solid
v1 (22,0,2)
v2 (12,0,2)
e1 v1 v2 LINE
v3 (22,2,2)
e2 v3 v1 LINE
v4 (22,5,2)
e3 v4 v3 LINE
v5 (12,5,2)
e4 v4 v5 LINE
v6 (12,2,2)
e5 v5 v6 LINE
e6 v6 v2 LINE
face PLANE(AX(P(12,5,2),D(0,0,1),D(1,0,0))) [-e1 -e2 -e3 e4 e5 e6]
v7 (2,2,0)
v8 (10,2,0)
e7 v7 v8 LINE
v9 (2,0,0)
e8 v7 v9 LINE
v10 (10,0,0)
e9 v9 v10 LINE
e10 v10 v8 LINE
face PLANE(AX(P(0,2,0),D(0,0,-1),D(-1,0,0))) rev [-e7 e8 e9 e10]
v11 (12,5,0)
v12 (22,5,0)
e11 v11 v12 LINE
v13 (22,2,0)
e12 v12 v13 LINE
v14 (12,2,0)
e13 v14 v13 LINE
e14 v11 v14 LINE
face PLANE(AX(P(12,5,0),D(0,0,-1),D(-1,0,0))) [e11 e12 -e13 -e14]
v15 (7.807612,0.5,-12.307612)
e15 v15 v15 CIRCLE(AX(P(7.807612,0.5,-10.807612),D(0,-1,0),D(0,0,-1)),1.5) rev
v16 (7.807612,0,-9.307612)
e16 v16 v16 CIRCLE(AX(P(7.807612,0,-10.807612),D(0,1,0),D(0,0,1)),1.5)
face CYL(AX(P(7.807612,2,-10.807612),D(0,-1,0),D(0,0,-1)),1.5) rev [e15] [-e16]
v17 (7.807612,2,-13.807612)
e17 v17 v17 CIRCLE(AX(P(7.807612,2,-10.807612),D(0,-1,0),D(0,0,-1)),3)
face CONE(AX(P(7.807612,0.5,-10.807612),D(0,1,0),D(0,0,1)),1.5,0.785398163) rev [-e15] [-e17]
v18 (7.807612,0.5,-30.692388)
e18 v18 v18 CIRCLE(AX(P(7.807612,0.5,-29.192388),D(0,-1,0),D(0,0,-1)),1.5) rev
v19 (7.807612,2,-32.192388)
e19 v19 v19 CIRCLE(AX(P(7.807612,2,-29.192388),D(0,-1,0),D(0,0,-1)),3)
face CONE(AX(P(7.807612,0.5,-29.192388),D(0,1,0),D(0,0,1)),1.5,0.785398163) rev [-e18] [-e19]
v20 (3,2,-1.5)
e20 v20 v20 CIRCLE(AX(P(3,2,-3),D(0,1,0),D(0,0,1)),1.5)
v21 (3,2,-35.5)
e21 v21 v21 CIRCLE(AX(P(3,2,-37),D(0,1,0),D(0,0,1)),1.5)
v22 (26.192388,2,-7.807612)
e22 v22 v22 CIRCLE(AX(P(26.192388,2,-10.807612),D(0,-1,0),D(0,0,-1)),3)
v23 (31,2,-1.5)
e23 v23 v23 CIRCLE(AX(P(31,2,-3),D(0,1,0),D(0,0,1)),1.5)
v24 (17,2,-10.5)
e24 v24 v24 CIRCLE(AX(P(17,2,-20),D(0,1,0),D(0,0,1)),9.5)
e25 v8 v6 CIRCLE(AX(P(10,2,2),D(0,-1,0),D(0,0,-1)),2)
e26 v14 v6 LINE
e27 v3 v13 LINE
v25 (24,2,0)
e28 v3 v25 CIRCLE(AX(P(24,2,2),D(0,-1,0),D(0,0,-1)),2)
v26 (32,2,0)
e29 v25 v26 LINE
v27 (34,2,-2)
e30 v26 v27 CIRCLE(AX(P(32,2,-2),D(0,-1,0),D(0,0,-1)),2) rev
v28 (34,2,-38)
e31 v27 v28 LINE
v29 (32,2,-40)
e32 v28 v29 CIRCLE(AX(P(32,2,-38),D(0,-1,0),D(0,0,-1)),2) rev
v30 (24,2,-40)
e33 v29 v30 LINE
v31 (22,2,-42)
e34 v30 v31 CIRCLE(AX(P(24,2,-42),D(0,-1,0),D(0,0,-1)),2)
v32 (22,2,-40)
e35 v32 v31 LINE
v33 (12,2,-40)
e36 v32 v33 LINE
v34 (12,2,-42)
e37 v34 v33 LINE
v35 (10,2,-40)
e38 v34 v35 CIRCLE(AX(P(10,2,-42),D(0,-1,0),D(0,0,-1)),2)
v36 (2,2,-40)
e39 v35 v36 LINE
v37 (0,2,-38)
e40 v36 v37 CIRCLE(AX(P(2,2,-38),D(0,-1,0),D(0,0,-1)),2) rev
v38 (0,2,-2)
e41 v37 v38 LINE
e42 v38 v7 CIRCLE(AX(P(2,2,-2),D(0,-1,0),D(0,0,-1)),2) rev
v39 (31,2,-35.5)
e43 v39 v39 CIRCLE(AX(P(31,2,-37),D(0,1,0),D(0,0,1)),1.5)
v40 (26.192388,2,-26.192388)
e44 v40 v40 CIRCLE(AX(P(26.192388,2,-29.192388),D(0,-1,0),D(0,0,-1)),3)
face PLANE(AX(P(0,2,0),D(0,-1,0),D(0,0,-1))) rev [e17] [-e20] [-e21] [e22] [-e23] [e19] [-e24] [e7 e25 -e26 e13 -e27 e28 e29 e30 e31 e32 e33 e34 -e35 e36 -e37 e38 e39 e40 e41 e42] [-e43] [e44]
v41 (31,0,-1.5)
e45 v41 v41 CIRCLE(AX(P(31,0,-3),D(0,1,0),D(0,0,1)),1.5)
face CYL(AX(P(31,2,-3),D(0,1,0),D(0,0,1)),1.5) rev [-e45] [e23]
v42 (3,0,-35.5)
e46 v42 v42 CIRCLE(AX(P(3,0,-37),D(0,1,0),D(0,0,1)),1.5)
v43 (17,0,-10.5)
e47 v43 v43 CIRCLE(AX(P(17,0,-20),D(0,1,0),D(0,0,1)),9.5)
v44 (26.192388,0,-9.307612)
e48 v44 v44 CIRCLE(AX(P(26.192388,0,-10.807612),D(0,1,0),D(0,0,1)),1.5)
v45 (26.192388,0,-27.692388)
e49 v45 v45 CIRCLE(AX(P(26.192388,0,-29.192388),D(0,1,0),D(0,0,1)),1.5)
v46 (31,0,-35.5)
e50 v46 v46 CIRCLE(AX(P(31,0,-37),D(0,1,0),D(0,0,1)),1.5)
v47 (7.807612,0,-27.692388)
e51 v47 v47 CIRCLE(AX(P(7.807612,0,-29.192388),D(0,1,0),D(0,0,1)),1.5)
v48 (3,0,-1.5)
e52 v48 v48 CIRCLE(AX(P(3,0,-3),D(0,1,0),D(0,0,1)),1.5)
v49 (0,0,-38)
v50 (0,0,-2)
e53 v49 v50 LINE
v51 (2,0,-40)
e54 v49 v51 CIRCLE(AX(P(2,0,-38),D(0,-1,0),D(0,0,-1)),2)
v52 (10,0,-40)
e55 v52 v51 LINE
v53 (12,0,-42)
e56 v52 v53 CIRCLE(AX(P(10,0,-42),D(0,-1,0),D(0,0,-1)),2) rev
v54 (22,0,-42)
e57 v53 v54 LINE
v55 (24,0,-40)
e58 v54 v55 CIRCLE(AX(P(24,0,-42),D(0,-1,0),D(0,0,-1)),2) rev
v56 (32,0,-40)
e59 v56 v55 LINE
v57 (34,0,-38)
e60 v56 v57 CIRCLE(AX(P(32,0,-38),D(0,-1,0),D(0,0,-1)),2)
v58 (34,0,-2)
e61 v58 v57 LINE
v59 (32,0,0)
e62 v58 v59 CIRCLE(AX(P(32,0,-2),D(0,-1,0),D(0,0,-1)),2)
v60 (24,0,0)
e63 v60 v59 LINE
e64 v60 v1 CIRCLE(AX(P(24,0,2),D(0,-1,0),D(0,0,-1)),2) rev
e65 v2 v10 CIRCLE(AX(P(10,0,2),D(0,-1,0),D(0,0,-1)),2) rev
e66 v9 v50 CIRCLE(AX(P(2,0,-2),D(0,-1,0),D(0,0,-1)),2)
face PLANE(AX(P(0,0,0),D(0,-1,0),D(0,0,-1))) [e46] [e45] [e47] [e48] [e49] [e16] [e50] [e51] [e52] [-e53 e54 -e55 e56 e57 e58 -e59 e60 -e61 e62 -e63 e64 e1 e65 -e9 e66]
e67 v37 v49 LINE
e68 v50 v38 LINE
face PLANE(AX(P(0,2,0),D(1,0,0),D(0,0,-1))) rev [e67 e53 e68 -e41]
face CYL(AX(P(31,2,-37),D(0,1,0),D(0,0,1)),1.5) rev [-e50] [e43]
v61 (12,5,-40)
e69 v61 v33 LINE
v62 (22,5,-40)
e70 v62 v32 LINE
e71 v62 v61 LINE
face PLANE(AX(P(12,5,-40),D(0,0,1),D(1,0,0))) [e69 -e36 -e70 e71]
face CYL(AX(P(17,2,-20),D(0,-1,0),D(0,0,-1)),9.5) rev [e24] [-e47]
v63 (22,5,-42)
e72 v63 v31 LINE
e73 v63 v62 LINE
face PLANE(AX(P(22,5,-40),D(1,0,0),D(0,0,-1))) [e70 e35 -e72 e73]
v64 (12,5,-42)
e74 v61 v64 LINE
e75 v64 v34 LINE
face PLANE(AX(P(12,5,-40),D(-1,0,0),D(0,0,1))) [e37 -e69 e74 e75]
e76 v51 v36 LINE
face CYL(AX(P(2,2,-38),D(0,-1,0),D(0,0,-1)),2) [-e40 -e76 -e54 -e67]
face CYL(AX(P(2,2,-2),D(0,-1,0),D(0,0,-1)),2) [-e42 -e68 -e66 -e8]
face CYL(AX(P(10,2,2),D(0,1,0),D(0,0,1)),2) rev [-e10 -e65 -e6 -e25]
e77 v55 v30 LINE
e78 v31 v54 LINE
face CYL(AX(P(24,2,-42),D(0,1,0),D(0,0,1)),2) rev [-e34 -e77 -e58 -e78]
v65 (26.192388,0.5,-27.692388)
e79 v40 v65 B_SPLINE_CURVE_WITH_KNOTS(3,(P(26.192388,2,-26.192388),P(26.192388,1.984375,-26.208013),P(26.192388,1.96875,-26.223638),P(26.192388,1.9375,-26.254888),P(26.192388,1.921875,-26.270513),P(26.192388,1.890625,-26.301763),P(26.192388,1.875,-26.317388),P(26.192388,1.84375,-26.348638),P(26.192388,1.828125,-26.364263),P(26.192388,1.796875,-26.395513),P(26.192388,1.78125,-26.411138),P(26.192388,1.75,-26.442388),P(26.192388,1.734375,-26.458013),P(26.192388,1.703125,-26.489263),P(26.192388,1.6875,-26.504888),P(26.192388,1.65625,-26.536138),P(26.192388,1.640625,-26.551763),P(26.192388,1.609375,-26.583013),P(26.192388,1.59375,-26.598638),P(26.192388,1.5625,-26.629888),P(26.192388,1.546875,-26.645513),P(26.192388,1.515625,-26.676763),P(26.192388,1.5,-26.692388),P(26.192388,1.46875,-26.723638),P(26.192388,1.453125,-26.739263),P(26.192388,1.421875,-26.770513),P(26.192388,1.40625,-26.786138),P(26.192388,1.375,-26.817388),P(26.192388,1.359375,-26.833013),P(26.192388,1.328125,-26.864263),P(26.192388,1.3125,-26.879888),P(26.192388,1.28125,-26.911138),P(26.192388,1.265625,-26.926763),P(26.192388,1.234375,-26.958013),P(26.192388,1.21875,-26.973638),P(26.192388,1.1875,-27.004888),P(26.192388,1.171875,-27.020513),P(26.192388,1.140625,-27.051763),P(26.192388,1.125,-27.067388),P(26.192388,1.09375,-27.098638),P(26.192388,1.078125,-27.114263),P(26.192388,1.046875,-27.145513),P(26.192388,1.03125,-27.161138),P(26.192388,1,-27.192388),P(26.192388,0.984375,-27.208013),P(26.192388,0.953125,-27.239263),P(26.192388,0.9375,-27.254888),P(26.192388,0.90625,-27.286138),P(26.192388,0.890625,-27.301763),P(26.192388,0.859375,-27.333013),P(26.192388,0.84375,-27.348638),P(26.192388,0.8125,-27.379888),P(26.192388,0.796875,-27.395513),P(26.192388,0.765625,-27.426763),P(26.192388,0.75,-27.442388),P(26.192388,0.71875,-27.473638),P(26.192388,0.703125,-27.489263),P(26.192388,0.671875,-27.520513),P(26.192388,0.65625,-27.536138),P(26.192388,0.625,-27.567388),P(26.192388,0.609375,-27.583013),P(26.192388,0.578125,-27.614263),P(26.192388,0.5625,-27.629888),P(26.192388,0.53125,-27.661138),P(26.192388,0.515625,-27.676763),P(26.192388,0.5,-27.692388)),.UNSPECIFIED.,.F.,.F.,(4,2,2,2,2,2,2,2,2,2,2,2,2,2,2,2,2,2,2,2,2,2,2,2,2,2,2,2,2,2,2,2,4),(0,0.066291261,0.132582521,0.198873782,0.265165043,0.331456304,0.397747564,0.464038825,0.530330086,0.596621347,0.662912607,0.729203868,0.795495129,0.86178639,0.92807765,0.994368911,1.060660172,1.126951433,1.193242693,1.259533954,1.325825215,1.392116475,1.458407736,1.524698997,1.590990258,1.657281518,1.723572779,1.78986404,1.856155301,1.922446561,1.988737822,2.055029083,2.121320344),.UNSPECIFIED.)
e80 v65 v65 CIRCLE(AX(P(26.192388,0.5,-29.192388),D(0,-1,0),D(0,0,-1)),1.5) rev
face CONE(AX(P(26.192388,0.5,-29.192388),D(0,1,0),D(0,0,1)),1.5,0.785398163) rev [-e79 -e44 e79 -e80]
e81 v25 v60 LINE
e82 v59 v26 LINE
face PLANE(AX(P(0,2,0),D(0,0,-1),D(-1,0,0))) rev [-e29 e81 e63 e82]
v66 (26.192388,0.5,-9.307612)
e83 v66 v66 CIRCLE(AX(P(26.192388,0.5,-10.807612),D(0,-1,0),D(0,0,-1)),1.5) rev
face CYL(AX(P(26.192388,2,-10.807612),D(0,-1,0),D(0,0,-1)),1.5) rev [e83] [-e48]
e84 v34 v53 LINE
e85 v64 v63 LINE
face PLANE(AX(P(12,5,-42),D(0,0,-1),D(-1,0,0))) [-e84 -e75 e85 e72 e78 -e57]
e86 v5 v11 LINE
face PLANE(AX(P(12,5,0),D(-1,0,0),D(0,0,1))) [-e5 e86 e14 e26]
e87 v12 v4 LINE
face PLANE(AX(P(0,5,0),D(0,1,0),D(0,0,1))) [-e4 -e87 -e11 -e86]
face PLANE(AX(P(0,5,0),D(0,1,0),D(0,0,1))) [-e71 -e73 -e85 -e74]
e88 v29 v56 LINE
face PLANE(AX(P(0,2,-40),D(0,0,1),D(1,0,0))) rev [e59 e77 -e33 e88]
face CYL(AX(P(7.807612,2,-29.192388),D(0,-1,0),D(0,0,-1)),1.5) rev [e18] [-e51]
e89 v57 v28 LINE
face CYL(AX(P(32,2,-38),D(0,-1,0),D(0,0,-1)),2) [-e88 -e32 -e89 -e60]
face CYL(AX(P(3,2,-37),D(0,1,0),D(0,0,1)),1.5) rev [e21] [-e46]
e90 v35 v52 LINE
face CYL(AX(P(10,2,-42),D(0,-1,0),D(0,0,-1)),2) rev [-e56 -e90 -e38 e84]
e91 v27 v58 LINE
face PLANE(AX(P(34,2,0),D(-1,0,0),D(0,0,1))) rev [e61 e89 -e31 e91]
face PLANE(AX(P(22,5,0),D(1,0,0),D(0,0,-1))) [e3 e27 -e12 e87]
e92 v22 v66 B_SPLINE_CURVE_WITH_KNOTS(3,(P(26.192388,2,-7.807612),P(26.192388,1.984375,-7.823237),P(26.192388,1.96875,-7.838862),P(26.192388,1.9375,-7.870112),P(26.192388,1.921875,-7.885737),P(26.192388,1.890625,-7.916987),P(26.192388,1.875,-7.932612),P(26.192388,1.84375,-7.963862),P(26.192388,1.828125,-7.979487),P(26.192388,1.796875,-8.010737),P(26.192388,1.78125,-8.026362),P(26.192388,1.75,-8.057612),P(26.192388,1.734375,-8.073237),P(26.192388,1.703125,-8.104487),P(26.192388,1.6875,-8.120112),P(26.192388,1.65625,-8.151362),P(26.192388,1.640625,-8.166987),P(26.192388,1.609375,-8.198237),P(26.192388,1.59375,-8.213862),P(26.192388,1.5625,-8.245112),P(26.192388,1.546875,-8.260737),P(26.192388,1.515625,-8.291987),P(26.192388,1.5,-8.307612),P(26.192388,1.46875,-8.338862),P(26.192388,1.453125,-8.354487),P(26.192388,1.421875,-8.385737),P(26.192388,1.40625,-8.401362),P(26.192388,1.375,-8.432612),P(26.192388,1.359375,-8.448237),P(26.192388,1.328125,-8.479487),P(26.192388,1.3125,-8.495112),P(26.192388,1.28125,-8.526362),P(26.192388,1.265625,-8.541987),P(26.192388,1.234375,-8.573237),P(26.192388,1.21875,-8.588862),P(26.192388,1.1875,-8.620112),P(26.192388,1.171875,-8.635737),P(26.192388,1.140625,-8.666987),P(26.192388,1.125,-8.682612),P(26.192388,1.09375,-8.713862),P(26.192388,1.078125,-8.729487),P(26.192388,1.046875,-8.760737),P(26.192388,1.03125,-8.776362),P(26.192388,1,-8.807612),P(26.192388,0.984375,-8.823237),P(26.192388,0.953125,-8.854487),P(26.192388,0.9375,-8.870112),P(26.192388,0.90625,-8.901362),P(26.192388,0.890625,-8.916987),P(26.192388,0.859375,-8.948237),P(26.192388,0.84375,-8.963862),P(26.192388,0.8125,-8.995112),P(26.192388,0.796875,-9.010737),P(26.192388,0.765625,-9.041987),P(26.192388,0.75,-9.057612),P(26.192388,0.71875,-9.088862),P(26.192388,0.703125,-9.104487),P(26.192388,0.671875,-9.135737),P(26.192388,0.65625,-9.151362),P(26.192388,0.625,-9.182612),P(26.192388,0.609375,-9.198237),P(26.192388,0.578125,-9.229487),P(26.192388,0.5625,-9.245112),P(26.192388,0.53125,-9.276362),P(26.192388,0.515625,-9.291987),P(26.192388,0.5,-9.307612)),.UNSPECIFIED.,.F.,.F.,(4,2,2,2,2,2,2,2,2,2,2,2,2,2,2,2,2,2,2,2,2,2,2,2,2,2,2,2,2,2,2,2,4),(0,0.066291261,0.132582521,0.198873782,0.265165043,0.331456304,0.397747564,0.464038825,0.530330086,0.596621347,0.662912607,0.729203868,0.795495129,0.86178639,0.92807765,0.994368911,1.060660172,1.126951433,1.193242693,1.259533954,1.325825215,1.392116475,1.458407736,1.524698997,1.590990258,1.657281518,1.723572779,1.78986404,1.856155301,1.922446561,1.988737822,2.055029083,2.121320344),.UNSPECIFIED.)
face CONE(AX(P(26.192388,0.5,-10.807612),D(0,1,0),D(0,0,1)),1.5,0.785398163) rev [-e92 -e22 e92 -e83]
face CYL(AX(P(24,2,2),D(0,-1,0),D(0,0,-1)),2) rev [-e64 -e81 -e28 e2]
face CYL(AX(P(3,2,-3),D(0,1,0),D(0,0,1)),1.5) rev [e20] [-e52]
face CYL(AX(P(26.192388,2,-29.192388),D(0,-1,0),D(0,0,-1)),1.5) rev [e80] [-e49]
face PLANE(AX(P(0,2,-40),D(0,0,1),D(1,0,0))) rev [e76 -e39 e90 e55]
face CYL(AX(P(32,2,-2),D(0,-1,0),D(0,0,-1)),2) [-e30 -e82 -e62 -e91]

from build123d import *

# Parameters (mm, degrees)
SKETCH_1_W            = 34
SKETCH_1_H            = 40
SKETCH_1_R            = 9.5
SKETCH_1_R_2          = 1.5
EXTRUDE_1_DEPTH       = 2
HOLE_WIZARD_3_0_3_1_D = 3
FILLET_1_R            = 2
SKETCH_5_W            = 10
SKETCH_5_H            = 2
EXTRUDE_2_DEPTH       = 5
FILLET_2_R            = 2
CHAMFER_1_SIZE        = 1.5


with BuildPart() as part:
    # 草图1 → 凸台-拉伸1 (new body)
    with BuildSketch(Plane(origin=(0, 0, 0), x_dir=(1, 0, 0), z_dir=(0, 1, 0))):
        with Locations((17, 20)):
            Rectangle(SKETCH_1_W, SKETCH_1_H)
        with Locations(Location((17, 20, 0), (0, 0, 270))):
            Circle(SKETCH_1_R, mode=Mode.SUBTRACT)
        with Locations(Location((26.192388155, 29.192388155, 0), (0, 0, 270))):
            Circle(SKETCH_1_R_2, mode=Mode.SUBTRACT)
        with Locations(Location((7.807611845, 29.192388155, 0), (0, 0, 270))):
            Circle(SKETCH_1_R_2, mode=Mode.SUBTRACT)
        with Locations(Location((7.807611845, 10.807611845, 0), (0, 0, 270))):
            Circle(SKETCH_1_R_2, mode=Mode.SUBTRACT)
        with Locations(Location((26.192388155, 10.807611845, 0), (0, 0, 270))):
            Circle(SKETCH_1_R_2, mode=Mode.SUBTRACT)
    extrude(amount=EXTRUDE_1_DEPTH)

    # Ø3.0 (3) 直径孔1 (through all)
    with Locations(Plane(origin=(3, 2, -37), x_dir=(0, 0, 1), z_dir=(0, 1, 0))):
        with Locations((0, 0), (0, 28), (34, 28), (34, 0)):
            Hole(HOLE_WIZARD_3_0_3_1_D / 2)

    # 圆角1
    fillet_1_edges = [part.edges().sort_by_distance(p)[0] for p in [
        (0, 1, -40),
        (34, 1, -40),
        (34, 1, 0),
        (0, 1, 0),
    ]]
    fillet(fillet_1_edges, radius=FILLET_1_R)

    # 草图5 → 凸台-拉伸2 (add)
    with BuildSketch(Plane.XZ):
        with Locations((17, 1)):
            Rectangle(SKETCH_5_W, SKETCH_5_H)
        with Locations((17, -41)):
            Rectangle(SKETCH_5_W, SKETCH_5_H)
    extrude(amount=-EXTRUDE_2_DEPTH)

    # 圆角2
    fillet_2_edges = [part.edges().sort_by_distance(p)[0] for p in [
        (22, 1, -40),
        (12, 1, -40),
        (12, 1, 0),
        (22, 1, 0),
    ]]
    fillet(fillet_2_edges, radius=FILLET_2_R - 0.0001)  # a hair under: the kernel refuses the full size

    # 倒角1
    chamfer_1_edges = [part.edges().sort_by_distance(p)[0] for p in [
        (26.192388155, 2, -30.692388155),
        (7.807611845, 2, -30.692388155),
        (7.807611845, 2, -12.307611845),
        (26.192388155, 2, -12.307611845),
    ]]
    chamfer(chamfer_1_edges, length=CHAMFER_1_SIZE)


solid = part.part
